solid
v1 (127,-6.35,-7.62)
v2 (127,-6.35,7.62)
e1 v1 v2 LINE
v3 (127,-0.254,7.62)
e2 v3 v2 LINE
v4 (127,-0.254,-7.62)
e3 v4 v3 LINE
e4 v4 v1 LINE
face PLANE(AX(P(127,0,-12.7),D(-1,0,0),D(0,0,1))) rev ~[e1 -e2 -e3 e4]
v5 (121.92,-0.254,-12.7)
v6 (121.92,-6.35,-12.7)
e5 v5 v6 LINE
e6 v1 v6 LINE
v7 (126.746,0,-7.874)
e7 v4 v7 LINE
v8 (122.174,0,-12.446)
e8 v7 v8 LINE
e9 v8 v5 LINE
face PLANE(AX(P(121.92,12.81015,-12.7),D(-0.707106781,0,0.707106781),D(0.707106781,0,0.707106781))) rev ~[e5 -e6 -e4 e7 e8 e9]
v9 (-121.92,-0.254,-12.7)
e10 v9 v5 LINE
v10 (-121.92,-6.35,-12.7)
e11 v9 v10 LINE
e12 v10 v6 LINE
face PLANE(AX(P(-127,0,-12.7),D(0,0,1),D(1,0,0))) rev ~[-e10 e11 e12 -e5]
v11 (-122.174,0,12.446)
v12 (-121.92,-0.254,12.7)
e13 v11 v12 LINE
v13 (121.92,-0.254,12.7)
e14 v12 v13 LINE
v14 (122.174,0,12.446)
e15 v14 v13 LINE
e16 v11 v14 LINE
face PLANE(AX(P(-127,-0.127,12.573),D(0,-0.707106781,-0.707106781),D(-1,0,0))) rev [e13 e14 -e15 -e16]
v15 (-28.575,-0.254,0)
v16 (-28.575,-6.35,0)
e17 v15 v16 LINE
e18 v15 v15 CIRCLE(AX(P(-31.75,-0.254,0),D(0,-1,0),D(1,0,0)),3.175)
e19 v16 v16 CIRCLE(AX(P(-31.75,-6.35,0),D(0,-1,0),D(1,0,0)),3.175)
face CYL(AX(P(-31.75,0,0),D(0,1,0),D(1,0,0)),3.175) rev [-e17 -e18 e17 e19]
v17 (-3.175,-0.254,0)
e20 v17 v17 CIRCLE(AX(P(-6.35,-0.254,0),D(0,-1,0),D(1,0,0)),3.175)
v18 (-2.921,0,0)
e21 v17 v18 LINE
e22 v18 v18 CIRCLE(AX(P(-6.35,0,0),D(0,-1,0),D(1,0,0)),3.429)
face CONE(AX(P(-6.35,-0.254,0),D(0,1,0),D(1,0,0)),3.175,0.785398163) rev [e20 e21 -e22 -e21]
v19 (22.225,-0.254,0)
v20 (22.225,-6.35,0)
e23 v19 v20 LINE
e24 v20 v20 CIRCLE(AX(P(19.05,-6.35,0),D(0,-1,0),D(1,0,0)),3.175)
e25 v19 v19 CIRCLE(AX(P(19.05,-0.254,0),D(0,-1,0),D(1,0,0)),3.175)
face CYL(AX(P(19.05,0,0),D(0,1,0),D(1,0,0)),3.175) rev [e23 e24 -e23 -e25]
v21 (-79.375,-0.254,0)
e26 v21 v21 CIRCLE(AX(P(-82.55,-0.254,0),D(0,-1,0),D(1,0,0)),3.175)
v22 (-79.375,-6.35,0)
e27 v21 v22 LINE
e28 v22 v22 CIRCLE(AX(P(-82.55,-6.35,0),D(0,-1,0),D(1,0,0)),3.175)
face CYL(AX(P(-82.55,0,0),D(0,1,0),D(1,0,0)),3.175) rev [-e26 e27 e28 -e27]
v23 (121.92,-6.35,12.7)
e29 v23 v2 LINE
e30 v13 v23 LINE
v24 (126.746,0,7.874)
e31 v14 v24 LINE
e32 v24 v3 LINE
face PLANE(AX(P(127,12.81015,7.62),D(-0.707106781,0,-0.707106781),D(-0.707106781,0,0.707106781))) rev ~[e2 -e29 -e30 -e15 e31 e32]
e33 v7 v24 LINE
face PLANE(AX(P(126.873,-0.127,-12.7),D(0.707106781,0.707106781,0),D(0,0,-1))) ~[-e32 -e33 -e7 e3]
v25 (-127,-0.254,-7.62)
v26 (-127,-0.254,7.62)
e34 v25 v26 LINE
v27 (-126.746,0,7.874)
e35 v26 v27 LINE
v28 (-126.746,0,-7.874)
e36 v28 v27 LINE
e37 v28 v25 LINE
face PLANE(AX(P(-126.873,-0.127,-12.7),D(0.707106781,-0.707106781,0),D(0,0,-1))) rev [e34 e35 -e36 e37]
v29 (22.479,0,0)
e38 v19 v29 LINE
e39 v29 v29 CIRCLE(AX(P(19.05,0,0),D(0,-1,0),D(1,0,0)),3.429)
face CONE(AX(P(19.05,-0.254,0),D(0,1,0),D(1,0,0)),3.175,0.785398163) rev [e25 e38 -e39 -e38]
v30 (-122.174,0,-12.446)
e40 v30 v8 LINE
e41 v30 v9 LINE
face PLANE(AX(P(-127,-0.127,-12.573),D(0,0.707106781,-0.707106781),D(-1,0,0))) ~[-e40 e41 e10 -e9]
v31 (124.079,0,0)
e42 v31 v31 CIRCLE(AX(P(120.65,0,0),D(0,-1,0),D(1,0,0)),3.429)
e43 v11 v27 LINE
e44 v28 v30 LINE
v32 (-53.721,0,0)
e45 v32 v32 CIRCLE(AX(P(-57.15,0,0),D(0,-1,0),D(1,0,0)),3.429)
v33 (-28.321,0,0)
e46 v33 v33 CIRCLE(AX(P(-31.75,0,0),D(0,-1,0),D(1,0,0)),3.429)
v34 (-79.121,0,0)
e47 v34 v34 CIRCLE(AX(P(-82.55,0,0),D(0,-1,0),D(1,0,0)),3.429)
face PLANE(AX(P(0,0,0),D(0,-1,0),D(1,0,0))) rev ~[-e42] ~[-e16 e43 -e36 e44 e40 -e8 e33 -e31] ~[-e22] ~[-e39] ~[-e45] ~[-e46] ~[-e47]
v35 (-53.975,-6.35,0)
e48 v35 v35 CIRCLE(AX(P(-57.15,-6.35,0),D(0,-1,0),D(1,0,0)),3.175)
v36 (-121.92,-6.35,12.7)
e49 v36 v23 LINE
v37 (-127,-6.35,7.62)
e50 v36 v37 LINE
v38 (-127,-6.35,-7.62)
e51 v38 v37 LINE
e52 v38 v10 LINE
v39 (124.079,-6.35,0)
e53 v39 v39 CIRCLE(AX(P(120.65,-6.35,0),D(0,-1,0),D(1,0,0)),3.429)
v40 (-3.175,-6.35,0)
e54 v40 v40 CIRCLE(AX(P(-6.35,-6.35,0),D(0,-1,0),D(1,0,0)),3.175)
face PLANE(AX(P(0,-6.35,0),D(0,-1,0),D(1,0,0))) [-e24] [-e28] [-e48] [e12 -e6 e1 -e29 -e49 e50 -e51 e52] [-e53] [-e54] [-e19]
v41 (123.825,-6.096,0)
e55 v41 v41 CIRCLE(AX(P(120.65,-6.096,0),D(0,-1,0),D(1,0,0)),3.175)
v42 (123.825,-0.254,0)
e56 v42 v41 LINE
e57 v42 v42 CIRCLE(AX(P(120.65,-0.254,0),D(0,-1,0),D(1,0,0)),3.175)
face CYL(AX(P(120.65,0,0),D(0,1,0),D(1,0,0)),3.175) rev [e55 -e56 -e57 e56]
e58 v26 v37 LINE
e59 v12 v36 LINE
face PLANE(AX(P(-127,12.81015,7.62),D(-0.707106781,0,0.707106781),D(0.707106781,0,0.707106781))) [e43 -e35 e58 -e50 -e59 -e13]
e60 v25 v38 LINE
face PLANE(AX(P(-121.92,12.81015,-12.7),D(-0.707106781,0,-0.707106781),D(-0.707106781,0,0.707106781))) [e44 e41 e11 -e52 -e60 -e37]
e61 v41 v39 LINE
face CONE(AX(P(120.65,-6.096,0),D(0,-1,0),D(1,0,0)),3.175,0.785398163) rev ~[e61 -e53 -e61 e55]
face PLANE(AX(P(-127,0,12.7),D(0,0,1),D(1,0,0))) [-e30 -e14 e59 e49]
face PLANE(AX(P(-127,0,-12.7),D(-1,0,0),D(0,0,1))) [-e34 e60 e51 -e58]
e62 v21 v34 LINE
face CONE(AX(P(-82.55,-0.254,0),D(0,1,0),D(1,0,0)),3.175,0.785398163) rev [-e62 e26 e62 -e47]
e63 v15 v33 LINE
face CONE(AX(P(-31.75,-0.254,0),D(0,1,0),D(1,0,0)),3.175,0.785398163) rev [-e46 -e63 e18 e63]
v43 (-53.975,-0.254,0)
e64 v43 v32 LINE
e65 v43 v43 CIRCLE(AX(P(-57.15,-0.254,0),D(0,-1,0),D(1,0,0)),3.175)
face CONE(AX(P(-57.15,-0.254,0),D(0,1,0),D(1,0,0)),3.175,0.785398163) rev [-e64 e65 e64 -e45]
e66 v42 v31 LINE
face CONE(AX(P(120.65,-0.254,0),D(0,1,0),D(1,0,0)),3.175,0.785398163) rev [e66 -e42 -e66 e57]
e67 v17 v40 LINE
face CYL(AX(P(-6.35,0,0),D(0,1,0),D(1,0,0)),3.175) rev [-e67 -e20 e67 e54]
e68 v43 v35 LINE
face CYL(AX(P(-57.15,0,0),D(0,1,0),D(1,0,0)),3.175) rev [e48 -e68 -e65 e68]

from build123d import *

# Parameters (mm, degrees)
F0_W        = 254
F0_H        = 25.4
F0_R        = 3.175
F1_DEPTH    = 6.35
F2_SIZE     = 0.254
F3_T1_DEPTH = 32.2242991577


# Not quite as in the source:
# - a fillet or chamfer that OpenCascade refuses, or shapes differently, is made with other operations: its cross-section is extruded or revolved along the edge and cut away or added
# - a feature names something its author has since deleted; it is built from what else it names


with BuildPart() as f1:
    # F0 (on Front) → F1 (new body)
    with BuildSketch(Plane.XZ):
        Rectangle(F0_W, F0_H)
        with Locations((-82.55, 0)):
            Circle(F0_R, mode=Mode.SUBTRACT)
        with Locations((-57.15, 0)):
            Circle(F0_R, mode=Mode.SUBTRACT)
        with Locations((-31.75, 0)):
            Circle(F0_R, mode=Mode.SUBTRACT)
        with Locations((-6.35, 0)):
            Circle(F0_R, mode=Mode.SUBTRACT)
        with Locations((19.05, 0)):
            Circle(F0_R, mode=Mode.SUBTRACT)
        with Locations((120.65, 0)):
            Circle(F0_R, mode=Mode.SUBTRACT)
    extrude(amount=F1_DEPTH)

    # F2
    f2_edges = [f1.edges().sort_by_distance(p)[0] for p in [
        (117.475, -6.35, 0),
        (117.475, 0, 0),
        (0, 0, -12.7),
        (127, 0, 0),
        (0, 0, 12.7),
        (-127, 0, 0),
        (-85.725, 0, 0),
        (-60.325, 0, 0),
        (-34.925, 0, 0),
        (-9.525, 0, 0),
        (15.875, 0, 0),
    ]]
    chamfer(f2_edges, length=F2_SIZE)

    # F3: chamfer of 5.08 on 4 edges, made by hand

    # F3_s2 → F3_t1 (cut)
    with BuildSketch(Plane.XZ.offset(-12.8101495789)):
        Polygon((-127, 7.62), (-121.92, 12.7), (-127, 12.7), align=None)
        Polygon((127, 7.62), (121.92, 12.7), (127, 12.7), align=None)
        Polygon((121.92, -12.7), (127, -7.62), (127, -12.7), align=None)
        Polygon((-121.92, -12.7), (-127, -7.62), (-127, -12.7), align=None)
    extrude(amount=F3_T1_DEPTH, mode=Mode.SUBTRACT)


solid = f1.part
